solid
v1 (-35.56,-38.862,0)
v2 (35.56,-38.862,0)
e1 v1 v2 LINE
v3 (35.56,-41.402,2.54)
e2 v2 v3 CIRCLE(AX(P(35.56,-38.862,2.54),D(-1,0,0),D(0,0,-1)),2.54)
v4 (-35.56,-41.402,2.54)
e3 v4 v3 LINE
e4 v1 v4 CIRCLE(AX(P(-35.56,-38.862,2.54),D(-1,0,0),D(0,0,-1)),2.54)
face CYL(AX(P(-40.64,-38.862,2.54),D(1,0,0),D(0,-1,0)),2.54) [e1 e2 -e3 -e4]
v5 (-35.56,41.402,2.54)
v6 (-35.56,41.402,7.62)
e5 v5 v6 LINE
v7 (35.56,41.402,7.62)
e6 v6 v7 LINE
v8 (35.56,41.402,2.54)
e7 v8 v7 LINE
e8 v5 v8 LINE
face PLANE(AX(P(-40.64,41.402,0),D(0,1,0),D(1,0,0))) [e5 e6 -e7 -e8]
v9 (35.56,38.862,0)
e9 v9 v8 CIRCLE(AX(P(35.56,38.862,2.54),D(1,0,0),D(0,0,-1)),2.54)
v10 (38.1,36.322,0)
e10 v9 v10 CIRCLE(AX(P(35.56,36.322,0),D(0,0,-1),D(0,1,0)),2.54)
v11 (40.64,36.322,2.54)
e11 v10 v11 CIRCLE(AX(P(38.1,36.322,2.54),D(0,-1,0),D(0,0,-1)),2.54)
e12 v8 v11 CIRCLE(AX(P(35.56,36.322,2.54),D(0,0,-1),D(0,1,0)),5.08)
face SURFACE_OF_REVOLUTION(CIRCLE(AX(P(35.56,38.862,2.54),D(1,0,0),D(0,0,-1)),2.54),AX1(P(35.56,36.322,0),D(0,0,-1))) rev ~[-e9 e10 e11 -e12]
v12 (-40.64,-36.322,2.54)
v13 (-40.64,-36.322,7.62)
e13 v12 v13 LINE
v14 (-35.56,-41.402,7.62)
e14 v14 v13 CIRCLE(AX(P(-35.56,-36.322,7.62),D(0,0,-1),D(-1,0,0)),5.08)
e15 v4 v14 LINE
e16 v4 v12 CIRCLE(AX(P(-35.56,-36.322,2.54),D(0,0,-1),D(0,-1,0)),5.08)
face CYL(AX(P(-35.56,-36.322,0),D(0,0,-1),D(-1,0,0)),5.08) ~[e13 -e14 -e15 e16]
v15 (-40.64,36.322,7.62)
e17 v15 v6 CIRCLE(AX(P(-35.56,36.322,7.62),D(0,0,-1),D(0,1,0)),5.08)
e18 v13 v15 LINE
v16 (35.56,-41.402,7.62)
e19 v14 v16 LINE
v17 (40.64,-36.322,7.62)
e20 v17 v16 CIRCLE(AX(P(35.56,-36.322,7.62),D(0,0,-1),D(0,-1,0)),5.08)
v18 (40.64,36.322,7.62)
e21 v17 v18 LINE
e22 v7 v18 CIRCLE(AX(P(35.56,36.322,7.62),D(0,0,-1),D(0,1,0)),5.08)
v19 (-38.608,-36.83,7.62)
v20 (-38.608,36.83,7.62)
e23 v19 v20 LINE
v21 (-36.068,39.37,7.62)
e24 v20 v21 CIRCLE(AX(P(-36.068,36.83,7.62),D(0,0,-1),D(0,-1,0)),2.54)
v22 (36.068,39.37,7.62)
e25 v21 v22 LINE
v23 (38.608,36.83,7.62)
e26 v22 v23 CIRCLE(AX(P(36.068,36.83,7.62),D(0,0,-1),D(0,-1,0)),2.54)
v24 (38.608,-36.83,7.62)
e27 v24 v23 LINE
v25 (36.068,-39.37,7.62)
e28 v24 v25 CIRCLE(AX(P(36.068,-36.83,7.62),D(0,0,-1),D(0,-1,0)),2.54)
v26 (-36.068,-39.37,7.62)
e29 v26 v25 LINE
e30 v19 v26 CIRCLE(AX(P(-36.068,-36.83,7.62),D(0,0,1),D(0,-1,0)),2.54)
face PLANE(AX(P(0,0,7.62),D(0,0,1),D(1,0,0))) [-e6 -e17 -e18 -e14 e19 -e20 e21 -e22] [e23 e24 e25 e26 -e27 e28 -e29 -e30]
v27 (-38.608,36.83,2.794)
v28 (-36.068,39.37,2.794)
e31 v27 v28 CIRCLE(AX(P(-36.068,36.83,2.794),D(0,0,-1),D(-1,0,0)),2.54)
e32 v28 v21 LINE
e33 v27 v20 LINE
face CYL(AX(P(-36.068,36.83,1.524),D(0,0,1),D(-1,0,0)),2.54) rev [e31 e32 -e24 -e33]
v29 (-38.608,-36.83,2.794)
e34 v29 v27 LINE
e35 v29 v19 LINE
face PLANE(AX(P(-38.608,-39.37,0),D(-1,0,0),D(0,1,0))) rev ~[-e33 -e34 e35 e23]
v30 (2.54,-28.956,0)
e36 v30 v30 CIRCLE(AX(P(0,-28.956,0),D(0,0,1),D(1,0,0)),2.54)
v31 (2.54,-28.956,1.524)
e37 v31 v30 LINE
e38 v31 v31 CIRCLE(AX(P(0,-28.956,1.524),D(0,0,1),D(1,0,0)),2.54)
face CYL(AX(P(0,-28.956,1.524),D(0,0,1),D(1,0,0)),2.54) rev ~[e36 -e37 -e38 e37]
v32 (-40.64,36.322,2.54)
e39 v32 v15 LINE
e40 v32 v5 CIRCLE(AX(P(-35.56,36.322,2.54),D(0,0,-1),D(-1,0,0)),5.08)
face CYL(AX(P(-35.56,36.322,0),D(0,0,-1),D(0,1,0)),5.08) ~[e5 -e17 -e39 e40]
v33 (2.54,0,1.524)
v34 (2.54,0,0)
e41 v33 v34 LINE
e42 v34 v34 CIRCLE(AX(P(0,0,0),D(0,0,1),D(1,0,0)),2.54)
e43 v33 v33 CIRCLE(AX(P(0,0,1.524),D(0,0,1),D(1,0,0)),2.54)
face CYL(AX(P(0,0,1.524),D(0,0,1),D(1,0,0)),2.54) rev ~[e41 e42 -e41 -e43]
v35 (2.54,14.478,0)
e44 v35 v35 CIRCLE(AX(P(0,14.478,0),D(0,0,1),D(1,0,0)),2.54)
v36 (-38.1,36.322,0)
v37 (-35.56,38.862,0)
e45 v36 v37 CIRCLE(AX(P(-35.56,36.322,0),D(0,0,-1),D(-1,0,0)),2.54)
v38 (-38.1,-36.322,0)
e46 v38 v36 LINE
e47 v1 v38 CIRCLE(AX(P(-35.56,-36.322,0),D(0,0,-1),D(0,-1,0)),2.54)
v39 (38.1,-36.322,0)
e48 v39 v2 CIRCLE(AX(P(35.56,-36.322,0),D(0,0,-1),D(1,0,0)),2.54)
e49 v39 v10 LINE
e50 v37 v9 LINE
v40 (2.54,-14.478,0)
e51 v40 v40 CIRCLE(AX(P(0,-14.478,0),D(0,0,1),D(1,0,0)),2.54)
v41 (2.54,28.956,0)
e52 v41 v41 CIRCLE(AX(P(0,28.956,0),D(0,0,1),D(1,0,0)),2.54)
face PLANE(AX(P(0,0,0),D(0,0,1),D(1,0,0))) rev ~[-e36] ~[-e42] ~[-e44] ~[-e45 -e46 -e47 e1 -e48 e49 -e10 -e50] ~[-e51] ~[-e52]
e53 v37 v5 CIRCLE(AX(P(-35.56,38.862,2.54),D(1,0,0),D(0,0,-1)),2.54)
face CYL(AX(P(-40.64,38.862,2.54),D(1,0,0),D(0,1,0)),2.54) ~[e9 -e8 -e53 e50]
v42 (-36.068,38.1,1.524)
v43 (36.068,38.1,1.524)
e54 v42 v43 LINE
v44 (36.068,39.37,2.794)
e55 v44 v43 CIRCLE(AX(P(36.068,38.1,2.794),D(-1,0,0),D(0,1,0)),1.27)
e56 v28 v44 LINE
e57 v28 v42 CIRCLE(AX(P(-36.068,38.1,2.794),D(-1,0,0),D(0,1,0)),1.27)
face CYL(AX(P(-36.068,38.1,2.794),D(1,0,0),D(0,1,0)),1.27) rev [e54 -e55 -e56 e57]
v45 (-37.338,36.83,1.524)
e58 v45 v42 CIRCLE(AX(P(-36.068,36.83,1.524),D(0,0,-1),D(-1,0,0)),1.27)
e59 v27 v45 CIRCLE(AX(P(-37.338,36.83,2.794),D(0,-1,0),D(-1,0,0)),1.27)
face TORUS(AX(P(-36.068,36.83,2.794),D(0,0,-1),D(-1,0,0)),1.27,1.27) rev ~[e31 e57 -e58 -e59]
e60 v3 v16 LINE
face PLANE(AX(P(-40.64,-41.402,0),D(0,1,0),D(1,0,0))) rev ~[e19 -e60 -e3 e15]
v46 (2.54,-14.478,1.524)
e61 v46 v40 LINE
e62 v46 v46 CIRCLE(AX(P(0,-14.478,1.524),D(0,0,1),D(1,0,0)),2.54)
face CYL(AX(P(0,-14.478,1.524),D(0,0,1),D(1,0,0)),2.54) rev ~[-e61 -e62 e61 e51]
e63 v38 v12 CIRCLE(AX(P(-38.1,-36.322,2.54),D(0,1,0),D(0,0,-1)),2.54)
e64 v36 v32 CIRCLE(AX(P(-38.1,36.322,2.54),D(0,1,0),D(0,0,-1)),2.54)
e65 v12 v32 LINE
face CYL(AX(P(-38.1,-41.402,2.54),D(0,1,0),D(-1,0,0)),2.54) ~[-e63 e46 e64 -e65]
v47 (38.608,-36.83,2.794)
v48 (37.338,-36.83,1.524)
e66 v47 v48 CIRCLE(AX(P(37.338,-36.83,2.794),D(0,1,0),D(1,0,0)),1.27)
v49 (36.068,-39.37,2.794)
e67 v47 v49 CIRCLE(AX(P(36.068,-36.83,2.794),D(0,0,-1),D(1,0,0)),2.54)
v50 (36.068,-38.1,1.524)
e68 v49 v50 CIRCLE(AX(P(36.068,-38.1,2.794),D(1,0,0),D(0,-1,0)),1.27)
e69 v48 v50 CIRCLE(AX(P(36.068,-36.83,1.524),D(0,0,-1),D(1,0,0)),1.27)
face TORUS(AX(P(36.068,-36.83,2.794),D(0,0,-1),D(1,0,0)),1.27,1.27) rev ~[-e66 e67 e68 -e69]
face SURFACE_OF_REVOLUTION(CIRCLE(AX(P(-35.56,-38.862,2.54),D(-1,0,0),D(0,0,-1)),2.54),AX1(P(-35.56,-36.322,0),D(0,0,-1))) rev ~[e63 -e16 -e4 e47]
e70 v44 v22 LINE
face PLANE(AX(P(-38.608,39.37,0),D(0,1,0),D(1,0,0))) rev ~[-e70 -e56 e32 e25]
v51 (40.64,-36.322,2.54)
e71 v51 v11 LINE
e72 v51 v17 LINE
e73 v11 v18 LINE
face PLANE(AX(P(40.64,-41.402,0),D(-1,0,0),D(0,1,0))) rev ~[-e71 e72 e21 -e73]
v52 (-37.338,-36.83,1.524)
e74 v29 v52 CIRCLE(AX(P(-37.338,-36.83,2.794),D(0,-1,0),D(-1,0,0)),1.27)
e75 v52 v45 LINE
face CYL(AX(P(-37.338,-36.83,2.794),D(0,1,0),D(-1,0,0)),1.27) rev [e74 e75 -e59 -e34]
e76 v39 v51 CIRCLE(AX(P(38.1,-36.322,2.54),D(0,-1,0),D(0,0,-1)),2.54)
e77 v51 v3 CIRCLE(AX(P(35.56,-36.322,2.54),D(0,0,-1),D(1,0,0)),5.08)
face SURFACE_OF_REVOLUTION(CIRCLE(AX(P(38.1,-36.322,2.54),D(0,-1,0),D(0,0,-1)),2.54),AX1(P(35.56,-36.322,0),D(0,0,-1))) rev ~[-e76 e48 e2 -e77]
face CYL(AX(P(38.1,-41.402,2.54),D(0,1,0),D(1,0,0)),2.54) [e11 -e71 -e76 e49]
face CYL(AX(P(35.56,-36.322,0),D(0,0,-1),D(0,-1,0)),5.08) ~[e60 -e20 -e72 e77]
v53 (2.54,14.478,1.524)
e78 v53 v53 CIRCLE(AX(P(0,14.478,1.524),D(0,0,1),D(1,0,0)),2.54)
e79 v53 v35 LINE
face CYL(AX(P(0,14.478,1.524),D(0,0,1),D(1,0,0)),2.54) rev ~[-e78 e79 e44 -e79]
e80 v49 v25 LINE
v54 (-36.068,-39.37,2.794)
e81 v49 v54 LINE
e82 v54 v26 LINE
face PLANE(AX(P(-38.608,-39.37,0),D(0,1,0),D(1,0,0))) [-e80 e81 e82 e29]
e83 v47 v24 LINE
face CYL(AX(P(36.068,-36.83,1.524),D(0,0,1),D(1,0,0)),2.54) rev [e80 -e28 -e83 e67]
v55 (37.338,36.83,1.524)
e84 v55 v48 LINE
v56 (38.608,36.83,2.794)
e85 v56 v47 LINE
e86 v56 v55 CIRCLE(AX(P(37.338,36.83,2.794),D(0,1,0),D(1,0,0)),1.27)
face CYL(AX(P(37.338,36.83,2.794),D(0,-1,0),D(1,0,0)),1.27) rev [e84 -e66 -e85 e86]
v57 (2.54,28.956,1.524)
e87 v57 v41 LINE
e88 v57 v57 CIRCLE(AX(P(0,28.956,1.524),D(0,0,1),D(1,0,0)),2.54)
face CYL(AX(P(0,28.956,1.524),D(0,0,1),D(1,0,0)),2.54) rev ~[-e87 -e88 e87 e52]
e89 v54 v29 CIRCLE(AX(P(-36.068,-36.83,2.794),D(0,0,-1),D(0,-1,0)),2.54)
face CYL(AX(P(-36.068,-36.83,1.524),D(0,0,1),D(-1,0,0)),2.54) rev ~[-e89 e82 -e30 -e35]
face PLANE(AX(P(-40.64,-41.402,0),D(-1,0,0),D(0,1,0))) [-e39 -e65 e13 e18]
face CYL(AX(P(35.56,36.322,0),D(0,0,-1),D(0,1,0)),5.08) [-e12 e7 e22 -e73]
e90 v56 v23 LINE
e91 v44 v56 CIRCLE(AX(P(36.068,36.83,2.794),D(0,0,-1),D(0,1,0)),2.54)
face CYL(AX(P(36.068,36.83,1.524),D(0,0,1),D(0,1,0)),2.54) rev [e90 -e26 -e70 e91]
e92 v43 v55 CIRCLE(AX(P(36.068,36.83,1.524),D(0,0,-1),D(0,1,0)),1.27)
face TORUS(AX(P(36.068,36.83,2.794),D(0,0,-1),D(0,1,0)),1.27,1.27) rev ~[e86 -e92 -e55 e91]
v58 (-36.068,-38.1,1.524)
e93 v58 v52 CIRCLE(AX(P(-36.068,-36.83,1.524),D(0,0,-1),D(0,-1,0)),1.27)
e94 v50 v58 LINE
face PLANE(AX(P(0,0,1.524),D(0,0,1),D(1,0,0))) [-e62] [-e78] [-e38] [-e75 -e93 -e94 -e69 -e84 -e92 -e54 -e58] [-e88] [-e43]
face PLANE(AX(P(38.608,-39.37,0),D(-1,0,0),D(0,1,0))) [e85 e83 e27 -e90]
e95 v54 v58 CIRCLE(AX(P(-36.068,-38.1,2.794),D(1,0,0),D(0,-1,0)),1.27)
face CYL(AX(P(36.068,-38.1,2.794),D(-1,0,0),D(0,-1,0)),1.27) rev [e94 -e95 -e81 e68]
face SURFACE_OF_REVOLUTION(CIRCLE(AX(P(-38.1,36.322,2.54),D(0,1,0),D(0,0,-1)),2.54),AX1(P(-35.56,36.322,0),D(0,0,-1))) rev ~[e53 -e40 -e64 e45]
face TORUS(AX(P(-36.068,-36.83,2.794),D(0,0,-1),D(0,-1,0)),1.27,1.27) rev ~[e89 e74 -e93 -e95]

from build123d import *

# Parameters (mm, degrees)
F0_W         = 81.28
F0_H         = 82.804
F0_W_2       = 77.216
F0_H_2       = 78.74
F1_DEPTH     = 7.62
F2_DEPTH     = 1.524
F3_R         = 2.54
F4_R         = 1.27
F5_R         = 2.54
F6_DEPTH     = 25.4
F7_T1_DEPTH  = 20.32
F7_T4_ANGLE  = 90
F7_T6_ANGLE  = 90
F7_T8_ANGLE  = 90
F7_T10_ANGLE = 90


# Not quite as in the source:
# - a fillet or chamfer that OpenCascade refuses, or shapes differently, is made with other operations: its cross-section is extruded or revolved along the edge and cut away or added


with BuildPart() as f1:
    # F0 (on Top) → F1 (new body)
    with BuildSketch(Plane.XY):
        Rectangle(F0_W, F0_H)
        Rectangle(F0_W_2, F0_H_2, mode=Mode.SUBTRACT)
    extrude(amount=F1_DEPTH)

    # F0 (on Top) → F2 (join)
    with BuildSketch(Plane.XY):
        Rectangle(F0_W, F0_H)
        Rectangle(F0_W_2, F0_H_2, mode=Mode.SUBTRACT)
        Rectangle(F0_W_2, F0_H_2)
    extrude(amount=F2_DEPTH)

    # F3
    f3_edges = [f1.edges().sort_by_distance(p)[0] for p in [
        (-38.608, 39.37, 4.572),
        (38.608, 39.37, 4.572),
        (38.608, -39.37, 4.572),
        (-38.608, -39.37, 4.572),
        (0, 41.402, 0),
        (-40.64, 0, 0),
        (0, -41.402, 0),
        (40.64, 0, 0),
    ]]
    fillet(f3_edges, radius=F3_R)

    # F4
    f4_edges = [f1.edges().sort_by_distance(p)[0] for p in [
        (-38.608, 0, 1.524),
        (-37.864051, -38.626051, 1.524),
        (-37.864051, 38.626051, 1.524),
        (0, -39.37, 1.524),
        (0, 39.37, 1.524),
        (37.864051, -38.626051, 1.524),
        (37.864051, 38.626051, 1.524),
        (38.608, 0, 1.524),
    ]]
    fillet(f4_edges, radius=F4_R)

    # F5 (on face) → F6 (cut)
    with BuildSketch(Plane.XY.offset(1.524)):
        with Locations((0, 28.956)):
            Circle(F5_R)
        with Locations((0, 14.478)):
            Circle(F5_R)
        Circle(F5_R)
        with Locations((0, -14.478)):
            Circle(F5_R)
        with Locations((0, -28.956)):
            Circle(F5_R)
    extrude(amount=-F6_DEPTH, mode=Mode.SUBTRACT)

    # F7: fillet of radius 5.08 on 4 edges, made by hand

    # F7_s2 → F7_t1 (cut)
    with BuildSketch(Plane.XY):
        with BuildLine():
            ThreePointArc((35.56, -41.402), (39.1521024484, -39.9141024484), (40.64, -36.322))
            Line((40.64, -36.322), (40.64, -41.402))
            Line((40.64, -41.402), (35.56, -41.402))
        make_face()
        with BuildLine():
            ThreePointArc((35.56, 41.402), (39.1521024484, 39.9141024484), (40.64, 36.322))
            Line((40.64, 36.322), (40.64, 41.402))
            Line((40.64, 41.402), (35.56, 41.402))
        make_face()
        with BuildLine():
            ThreePointArc((-35.56, 41.402), (-39.1521024484, 39.9141024484), (-40.64, 36.322))
            Line((-40.64, 36.322), (-40.64, 41.402))
            Line((-40.64, 41.402), (-35.56, 41.402))
        make_face()
        with BuildLine():
            ThreePointArc((-40.64, -36.322), (-39.1521024484, -39.9141024484), (-35.56, -41.402))
            Line((-35.56, -41.402), (-40.64, -41.402))
            Line((-40.64, -41.402), (-40.64, -36.322))
        make_face()
    extrude(amount=F7_T1_DEPTH, mode=Mode.SUBTRACT)

    # F7_s3 → F7_t4 (revolve, cut)
    with BuildSketch(Plane.YZ.offset(-35.56)):
        with BuildLine():
            ThreePointArc((-38.862, 0), (-40.6580512242, 0.7439487758), (-41.402, 2.54))
            Line((-41.402, 2.54), (-41.402, 0))
            Line((-41.402, 0), (-38.862, 0))
        make_face()
    revolve(axis=Axis((-35.56, -36.322, 0), (0, 0, -1)), revolution_arc=F7_T4_ANGLE, mode=Mode.SUBTRACT)

    # F7_s5 → F7_t6 (revolve, cut)
    with BuildSketch(Plane.XZ.offset(-36.322)):
        with BuildLine():
            ThreePointArc((-38.1, 0), (-39.8960512242, 0.7439487758), (-40.64, 2.54))
            Line((-40.64, 2.54), (-40.64, 0))
            Line((-40.64, 0), (-38.1, 0))
        make_face()
    revolve(axis=Axis((-35.56, 36.322, 0), (0, 0, -1)), revolution_arc=F7_T6_ANGLE, mode=Mode.SUBTRACT)

    # F7_s7 → F7_t8 (revolve, cut)
    with BuildSketch(Plane.YZ.offset(35.56)):
        with BuildLine():
            ThreePointArc((38.862, 0), (40.6580512242, 0.7439487758), (41.402, 2.54))
            Line((41.402, 2.54), (41.402, 0))
            Line((41.402, 0), (38.862, 0))
        make_face()
    revolve(axis=Axis((35.56, 36.322, 0), (0, 0, -1)), revolution_arc=F7_T8_ANGLE, mode=Mode.SUBTRACT)

    # F7_s9 → F7_t10 (revolve, cut)
    with BuildSketch(Plane.XZ.offset(36.322)):
        with BuildLine():
            ThreePointArc((38.1, 0), (39.8960512242, 0.7439487758), (40.64, 2.54))
            Line((40.64, 2.54), (40.64, 0))
            Line((40.64, 0), (38.1, 0))
        make_face()
    revolve(axis=Axis((35.56, -36.322, 0), (0, 0, -1)), revolution_arc=F7_T10_ANGLE, mode=Mode.SUBTRACT)


solid = f1.part
